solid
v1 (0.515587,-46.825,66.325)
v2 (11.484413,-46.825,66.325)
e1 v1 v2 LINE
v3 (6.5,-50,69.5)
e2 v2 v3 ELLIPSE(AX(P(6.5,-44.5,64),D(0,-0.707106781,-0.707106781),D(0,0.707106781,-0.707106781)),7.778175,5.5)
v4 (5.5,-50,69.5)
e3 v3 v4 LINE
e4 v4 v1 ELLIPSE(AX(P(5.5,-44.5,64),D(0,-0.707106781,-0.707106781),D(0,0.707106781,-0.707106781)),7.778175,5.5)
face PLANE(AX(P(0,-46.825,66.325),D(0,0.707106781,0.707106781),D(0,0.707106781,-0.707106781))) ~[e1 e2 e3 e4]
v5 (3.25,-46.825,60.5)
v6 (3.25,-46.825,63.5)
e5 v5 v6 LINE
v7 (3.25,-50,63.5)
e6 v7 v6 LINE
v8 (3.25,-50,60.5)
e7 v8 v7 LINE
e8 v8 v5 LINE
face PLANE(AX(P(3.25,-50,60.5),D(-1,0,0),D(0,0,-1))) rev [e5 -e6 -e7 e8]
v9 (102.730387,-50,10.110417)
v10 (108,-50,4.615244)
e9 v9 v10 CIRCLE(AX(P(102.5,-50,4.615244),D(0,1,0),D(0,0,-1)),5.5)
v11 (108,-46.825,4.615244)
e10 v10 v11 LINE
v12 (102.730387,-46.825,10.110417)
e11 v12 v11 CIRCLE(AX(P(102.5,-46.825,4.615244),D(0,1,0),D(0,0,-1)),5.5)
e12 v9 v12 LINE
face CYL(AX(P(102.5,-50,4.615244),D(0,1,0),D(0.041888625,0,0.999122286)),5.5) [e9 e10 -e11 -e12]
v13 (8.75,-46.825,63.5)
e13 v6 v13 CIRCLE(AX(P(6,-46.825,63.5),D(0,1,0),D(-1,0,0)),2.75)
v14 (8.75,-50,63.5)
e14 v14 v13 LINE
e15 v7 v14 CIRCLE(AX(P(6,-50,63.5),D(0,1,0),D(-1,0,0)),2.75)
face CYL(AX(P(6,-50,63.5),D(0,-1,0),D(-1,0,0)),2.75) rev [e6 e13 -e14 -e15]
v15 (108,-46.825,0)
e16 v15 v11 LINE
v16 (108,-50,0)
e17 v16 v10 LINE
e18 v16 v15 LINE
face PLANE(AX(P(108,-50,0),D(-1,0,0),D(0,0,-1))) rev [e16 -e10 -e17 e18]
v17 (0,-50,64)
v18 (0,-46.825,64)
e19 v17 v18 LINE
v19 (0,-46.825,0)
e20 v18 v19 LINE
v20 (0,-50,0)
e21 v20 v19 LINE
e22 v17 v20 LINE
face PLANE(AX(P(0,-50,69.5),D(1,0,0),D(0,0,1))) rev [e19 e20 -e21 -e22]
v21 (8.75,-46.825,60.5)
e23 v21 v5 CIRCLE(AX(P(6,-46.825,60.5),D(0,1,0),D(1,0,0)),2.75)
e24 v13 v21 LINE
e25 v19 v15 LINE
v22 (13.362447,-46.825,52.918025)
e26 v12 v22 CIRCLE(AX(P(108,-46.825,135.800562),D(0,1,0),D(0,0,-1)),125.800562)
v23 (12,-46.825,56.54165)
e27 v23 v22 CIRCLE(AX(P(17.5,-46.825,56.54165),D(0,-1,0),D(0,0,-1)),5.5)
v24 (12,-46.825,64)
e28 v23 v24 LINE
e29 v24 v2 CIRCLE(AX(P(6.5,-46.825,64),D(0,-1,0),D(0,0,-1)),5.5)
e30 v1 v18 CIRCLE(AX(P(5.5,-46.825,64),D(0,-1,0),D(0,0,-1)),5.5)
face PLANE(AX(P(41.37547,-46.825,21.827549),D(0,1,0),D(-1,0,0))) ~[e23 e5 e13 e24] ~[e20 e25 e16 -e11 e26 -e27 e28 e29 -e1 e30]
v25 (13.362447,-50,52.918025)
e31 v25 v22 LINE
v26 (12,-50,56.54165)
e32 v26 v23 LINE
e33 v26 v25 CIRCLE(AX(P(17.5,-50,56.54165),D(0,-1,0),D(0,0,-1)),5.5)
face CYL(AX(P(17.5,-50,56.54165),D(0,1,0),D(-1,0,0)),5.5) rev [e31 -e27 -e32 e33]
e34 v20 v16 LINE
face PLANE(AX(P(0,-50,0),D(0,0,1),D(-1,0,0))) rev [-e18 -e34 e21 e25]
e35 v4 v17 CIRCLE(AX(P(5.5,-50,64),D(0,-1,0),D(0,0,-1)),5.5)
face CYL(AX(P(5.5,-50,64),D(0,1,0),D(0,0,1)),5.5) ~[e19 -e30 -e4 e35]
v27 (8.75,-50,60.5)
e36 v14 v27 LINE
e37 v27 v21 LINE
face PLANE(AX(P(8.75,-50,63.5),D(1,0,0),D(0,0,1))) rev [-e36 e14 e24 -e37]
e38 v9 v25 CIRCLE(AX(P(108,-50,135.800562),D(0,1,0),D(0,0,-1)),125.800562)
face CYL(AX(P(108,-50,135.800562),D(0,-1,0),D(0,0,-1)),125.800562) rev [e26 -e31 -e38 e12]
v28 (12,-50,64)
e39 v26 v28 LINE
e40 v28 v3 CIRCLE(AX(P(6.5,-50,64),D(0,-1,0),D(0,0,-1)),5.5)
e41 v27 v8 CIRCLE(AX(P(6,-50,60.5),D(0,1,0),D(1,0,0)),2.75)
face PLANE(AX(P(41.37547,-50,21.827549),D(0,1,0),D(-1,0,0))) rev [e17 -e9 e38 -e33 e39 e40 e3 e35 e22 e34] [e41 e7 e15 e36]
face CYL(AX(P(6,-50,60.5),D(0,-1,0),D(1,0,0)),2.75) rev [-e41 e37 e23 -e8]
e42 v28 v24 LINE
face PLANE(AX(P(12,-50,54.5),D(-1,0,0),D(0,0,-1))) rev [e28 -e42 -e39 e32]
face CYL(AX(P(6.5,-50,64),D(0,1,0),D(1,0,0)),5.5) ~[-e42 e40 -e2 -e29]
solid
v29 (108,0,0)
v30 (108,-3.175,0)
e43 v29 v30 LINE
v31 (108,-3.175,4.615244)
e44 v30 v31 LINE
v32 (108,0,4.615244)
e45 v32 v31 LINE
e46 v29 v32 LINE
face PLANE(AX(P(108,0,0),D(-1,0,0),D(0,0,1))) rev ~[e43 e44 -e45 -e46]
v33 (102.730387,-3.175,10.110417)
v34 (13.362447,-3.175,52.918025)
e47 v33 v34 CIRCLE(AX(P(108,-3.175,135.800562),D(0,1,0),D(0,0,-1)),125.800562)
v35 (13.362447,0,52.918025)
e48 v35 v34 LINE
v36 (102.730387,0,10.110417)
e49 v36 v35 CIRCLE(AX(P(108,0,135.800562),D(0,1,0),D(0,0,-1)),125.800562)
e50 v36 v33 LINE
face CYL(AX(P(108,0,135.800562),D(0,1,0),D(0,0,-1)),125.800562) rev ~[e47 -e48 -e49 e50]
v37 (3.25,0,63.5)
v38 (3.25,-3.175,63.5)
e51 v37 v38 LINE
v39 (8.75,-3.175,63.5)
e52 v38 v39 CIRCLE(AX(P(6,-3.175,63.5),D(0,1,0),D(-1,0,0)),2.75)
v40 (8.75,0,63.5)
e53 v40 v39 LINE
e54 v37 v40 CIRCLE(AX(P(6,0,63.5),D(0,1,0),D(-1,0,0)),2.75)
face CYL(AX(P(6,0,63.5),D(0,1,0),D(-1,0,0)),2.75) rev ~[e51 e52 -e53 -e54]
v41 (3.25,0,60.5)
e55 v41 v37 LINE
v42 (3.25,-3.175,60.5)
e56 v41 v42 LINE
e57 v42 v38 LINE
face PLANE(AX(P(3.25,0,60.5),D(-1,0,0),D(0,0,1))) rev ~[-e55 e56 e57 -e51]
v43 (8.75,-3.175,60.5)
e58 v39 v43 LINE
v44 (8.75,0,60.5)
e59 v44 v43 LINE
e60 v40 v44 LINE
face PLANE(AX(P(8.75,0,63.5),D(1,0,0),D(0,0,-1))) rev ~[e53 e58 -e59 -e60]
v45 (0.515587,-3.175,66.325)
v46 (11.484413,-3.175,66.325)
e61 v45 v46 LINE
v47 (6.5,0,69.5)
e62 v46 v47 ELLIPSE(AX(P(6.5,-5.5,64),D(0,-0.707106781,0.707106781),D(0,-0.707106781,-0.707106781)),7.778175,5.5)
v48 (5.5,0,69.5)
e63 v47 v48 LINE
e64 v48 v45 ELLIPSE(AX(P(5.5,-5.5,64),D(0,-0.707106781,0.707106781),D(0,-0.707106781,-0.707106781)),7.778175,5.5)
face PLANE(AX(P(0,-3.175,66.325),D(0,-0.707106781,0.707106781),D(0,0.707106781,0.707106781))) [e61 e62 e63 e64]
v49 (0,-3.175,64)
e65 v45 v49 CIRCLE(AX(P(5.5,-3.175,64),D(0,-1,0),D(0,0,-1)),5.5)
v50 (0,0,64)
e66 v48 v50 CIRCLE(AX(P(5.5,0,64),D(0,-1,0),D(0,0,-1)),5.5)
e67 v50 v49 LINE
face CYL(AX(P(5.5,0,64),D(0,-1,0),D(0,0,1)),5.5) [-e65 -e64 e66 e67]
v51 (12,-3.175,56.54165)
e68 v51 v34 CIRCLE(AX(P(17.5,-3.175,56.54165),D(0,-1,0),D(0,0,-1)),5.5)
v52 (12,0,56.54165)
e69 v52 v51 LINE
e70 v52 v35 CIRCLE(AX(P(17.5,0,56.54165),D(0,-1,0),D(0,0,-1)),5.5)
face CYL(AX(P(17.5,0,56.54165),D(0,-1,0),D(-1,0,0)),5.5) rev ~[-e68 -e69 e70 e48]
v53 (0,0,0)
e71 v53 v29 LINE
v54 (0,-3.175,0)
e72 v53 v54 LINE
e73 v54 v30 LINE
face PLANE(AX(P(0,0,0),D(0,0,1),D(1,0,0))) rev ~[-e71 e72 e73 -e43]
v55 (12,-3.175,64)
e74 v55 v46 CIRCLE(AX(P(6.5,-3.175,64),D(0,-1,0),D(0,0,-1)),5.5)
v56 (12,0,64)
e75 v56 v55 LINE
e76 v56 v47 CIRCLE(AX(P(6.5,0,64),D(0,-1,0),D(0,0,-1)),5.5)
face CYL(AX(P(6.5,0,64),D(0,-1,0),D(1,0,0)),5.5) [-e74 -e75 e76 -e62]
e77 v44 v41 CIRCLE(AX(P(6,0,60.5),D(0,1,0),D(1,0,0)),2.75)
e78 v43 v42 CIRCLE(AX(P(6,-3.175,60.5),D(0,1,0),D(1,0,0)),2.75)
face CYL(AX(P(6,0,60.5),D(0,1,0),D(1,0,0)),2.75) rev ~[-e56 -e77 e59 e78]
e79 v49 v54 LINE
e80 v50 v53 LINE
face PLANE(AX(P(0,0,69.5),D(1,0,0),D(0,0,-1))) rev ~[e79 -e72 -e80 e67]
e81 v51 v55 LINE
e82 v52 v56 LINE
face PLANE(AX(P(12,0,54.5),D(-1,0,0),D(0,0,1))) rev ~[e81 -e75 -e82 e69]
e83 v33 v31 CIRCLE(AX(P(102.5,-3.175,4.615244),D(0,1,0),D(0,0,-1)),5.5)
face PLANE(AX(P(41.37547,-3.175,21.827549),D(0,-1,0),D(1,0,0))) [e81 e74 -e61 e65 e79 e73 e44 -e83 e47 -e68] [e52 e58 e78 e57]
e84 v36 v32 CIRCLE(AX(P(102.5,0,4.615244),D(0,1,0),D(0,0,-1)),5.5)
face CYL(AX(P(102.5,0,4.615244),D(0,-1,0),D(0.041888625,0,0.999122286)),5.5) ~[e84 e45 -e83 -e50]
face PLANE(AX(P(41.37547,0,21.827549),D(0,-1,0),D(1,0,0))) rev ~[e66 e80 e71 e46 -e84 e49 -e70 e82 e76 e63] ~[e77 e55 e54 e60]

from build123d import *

# Parameters (mm, degrees)
F1_DEPTH      = 3.175
F2_R          = 5.5
F4_DEPTH      = 169
F4_DEPTH_BACK = 108.001


# Not quite as in the source:
# - an extrude ends at something that could not be found from the text; its depth is read off the source's solid
# - a feature names something its author has since deleted; it is built from what else it names


with BuildPart() as f1:
    # F0 (on Front) → F1 (new body)
    with BuildSketch(Plane.XZ):
        with BuildLine():
            Line((12, 54.5), (12, 69.5))
            Line((12, 69.5), (0, 69.5))
            Line((0, 69.5), (0, 0))
            Line((0, 0), (108, 0))
            Line((108, 0), (108, 10))
            ThreePointArc((108, 10), (55.0938330627, 21.6659095285), (12, 54.5))
        make_face()
        with BuildLine():
            ThreePointArc((3.25, 63.5), (6, 66.25), (8.75, 63.5))
            Line((8.75, 63.5), (8.75, 60.5))
            ThreePointArc((8.75, 60.5), (6, 57.75), (3.25, 60.5))
            Line((3.25, 60.5), (3.25, 63.5))
        make_face(mode=Mode.SUBTRACT)
    extrude(amount=F1_DEPTH)

    # F2
    f2_edges = [f1.edges().sort_by_distance(p)[0] for p in [
        (0, -1.5875, 69.5),
        (12, -1.5875, 54.5),
        (108, -1.5875, 10),
        (12, -1.5875, 69.5),
    ]]
    fillet(f2_edges, radius=F2_R)

    # F3 (on Right) → F4 (cut, two sides)
    with BuildSketch(Plane.YZ) as f4_sk:
        Polygon((0, 69.5), (-3.175, 69.5), (-3.175, 66.325), align=None)
    extrude(amount=-F4_DEPTH, mode=Mode.SUBTRACT)
    extrude(f4_sk.sketch, amount=F4_DEPTH_BACK, mode=Mode.SUBTRACT)


with BuildPart() as f6_1:
    # F6: instance of F1
    add(f1.part.mirror(Plane.XZ.offset(25)))


solid = Compound([f1.part, f6_1.part])
